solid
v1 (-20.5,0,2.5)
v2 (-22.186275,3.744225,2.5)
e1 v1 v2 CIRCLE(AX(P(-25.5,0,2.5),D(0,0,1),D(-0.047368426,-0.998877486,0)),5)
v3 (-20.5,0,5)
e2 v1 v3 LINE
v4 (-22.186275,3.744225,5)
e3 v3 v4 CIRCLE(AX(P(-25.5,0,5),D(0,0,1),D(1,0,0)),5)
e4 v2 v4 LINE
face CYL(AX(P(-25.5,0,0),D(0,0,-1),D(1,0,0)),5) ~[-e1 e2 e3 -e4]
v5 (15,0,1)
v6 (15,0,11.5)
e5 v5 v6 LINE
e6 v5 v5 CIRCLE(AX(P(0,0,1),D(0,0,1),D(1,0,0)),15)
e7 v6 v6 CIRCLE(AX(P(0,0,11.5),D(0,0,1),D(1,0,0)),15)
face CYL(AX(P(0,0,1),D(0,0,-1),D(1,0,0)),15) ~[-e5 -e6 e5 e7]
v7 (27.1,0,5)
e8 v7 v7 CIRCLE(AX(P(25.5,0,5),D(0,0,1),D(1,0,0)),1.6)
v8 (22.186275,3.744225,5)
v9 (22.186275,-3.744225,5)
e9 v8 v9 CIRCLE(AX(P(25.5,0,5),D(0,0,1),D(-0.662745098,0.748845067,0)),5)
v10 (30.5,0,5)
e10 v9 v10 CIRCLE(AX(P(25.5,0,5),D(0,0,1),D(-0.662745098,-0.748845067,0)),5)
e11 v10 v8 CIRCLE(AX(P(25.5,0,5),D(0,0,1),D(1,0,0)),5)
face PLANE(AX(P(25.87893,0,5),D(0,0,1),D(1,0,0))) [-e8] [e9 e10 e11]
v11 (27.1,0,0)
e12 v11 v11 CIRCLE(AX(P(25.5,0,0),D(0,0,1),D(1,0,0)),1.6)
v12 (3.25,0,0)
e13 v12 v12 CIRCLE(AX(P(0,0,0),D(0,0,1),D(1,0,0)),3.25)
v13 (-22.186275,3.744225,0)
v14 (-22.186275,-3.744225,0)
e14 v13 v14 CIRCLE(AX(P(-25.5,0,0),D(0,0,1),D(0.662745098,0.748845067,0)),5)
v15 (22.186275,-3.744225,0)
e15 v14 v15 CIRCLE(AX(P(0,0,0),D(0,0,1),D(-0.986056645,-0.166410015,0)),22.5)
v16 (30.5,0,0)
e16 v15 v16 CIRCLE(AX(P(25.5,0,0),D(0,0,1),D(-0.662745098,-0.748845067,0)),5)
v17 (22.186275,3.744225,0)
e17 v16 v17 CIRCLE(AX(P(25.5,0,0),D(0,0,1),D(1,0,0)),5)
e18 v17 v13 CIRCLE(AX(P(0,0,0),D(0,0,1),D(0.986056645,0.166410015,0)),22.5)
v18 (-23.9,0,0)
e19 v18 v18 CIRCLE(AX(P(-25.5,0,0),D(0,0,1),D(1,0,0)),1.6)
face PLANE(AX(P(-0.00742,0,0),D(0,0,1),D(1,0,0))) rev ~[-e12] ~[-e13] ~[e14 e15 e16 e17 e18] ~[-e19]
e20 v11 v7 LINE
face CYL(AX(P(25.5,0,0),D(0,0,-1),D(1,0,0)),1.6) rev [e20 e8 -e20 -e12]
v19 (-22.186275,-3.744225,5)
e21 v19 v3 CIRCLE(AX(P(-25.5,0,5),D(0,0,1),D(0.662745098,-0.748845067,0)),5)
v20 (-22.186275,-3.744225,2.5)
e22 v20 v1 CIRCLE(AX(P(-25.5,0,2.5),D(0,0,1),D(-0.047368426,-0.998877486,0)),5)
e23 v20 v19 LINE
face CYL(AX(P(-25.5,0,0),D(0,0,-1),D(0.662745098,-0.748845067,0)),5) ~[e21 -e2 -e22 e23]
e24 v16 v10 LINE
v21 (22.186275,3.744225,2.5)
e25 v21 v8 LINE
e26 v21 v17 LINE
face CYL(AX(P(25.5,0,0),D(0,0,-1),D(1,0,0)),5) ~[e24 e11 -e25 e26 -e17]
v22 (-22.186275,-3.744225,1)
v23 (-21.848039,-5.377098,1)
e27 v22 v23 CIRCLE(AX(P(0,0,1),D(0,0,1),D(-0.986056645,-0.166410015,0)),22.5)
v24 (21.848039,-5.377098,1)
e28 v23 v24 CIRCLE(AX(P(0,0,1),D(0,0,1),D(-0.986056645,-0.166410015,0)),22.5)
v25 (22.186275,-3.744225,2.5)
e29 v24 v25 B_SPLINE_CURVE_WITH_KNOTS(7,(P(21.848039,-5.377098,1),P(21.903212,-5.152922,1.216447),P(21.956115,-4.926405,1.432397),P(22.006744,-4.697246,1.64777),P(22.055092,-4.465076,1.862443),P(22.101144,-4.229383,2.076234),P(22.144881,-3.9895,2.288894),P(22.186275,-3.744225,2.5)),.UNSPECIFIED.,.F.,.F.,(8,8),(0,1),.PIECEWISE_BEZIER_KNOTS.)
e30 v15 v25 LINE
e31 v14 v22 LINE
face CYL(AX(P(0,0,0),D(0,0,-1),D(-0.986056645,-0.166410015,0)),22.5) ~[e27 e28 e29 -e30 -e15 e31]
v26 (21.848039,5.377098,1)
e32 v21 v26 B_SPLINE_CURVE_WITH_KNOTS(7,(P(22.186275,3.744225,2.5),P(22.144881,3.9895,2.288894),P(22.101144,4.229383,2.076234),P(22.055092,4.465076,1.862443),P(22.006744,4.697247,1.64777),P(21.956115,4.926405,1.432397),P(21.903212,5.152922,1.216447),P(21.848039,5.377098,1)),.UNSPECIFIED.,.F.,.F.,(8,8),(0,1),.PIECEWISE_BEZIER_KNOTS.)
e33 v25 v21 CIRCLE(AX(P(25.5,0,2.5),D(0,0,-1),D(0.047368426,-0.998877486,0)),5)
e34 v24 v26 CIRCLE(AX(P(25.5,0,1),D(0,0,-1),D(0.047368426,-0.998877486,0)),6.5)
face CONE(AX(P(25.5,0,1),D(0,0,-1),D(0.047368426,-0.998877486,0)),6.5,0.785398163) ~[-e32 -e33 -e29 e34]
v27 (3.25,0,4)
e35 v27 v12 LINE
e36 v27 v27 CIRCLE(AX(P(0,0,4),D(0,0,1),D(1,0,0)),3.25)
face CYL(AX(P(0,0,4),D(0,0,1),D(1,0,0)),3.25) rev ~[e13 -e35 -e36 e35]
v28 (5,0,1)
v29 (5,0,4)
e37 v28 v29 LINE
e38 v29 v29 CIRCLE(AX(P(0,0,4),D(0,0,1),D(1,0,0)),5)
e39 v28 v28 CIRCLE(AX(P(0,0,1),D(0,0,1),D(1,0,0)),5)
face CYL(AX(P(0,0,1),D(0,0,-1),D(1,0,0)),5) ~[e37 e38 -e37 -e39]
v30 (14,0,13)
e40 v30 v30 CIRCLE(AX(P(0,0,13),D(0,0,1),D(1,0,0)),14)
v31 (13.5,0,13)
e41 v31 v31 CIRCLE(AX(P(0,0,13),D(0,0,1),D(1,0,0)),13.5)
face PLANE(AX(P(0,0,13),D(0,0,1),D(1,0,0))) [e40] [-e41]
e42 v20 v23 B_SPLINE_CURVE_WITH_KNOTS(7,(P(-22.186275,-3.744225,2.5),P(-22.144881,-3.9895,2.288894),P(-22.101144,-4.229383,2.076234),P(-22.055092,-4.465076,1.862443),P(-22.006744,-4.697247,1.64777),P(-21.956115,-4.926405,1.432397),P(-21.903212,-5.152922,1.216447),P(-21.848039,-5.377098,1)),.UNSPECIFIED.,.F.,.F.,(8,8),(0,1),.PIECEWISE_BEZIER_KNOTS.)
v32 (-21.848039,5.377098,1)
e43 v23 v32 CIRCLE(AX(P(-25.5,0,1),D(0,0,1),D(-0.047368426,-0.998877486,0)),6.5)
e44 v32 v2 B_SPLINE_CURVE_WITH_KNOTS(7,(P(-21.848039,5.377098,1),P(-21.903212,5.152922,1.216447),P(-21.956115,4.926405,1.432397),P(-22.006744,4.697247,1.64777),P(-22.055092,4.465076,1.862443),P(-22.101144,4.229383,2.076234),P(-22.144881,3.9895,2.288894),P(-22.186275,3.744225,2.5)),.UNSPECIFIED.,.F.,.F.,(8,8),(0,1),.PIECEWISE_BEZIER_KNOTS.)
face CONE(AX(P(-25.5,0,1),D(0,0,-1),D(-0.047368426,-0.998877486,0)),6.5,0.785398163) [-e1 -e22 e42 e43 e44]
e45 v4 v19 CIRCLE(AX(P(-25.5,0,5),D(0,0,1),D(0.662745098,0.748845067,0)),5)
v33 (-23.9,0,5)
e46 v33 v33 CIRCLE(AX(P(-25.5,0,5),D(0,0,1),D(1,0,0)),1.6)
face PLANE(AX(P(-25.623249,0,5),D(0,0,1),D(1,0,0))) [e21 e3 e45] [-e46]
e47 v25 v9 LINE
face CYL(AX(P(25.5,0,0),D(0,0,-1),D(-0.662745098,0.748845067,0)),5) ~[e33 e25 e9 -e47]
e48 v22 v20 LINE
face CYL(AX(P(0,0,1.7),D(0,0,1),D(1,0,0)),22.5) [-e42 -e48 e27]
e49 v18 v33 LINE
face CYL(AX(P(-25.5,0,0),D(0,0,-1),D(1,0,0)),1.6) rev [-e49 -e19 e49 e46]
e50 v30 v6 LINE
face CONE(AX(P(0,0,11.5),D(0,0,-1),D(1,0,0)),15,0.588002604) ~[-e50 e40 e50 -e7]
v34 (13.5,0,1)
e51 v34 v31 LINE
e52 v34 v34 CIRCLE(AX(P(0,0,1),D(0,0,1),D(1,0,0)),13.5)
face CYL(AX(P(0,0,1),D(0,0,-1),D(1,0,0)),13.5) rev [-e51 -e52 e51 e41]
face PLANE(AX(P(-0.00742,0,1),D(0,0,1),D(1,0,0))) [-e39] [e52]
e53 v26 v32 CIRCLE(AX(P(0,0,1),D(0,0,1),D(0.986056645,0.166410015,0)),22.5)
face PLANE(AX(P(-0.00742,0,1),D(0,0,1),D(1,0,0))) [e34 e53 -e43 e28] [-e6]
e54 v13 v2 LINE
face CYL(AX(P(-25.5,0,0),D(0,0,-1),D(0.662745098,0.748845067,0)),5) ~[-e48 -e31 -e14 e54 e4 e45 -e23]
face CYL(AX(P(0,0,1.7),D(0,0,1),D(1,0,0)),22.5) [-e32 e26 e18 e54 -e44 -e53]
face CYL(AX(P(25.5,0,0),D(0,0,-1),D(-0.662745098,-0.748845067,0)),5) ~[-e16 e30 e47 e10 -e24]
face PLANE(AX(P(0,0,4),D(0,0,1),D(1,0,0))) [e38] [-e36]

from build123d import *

# Parameters (mm, degrees)
F0_R         = 1.6
F1_DEPTH     = 5
F2_DEPTH     = 1
F3_R         = 15
F3_R_2       = 13.5
F4_DEPTH     = 12
F5_SIZE2     = 1.5
F5_SIZE      = 1
F8_T4_ANGLE  = 185.4300536725
F8_S5_R      = 22.5
F8_T6_DEPTH  = 9
F8_T10_ANGLE = 185.4300536725
F8_S11_R     = 22.5
F8_T12_DEPTH = 9
F9_R         = 5
F10_DEPTH    = 3
F11_R        = 3.25
F12_DEPTH    = 5


# Not quite as in the source:
# - a fillet or chamfer that OpenCascade refuses, or shapes differently, is made with other operations: its cross-section is extruded or revolved along the edge and cut away or added
# - a feature of the source that left no trace in its solid (it failed there, or was rolled back) is left out


with BuildPart() as f1:
    # F0 (on Top) → F1 (new body)
    with BuildSketch(Plane.XY):
        with BuildLine():
            ThreePointArc((-22.1862745098, -3.7442253372), (-22.5, 0), (-22.1862745098, 3.7442253372))
            ThreePointArc((-22.1862745098, 3.7442253372), (-30.5, 0), (-22.1862745098, -3.7442253372))
        make_face()
        with Locations((-25.5, 0)):
            Circle(F0_R, mode=Mode.SUBTRACT)
        with BuildLine():
            ThreePointArc((-20.5, 0), (-20.9410183456, 2.0532136456), (-22.1862745098, 3.7442253372))
            ThreePointArc((-22.1862745098, 3.7442253372), (-22.5, 0), (-22.1862745098, -3.7442253372))
            ThreePointArc((-22.1862745098, -3.7442253372), (-20.9410183456, -2.0532136456), (-20.5, 0))
        make_face()
    extrude(amount=F1_DEPTH)



with BuildPart() as f1b:
    # F0 (on Top) → F1, piece 2 (new body)
    with BuildSketch(Plane.XY):
        with BuildLine():
            ThreePointArc((22.1862745098, 3.7442253372), (22.4214314493, 1.8786728733), (22.5, 0))
            ThreePointArc((22.5, 0), (22.4214314493, -1.8786728733), (22.1862745098, -3.7442253372))
            ThreePointArc((22.1862745098, -3.7442253372), (27.5532136456, -4.5589816544), (30.5, 0))
            ThreePointArc((30.5, 0), (27.5532136456, 4.5589816544), (22.1862745098, 3.7442253372))
        make_face()
        with Locations((25.5, 0)):
            Circle(F0_R, mode=Mode.SUBTRACT)
        with BuildLine():
            ThreePointArc((22.1862745098, -3.7442253372), (22.4214314493, -1.8786728733), (22.5, 0))
            ThreePointArc((22.5, 0), (22.4214314493, 1.8786728733), (22.1862745098, 3.7442253372))
            ThreePointArc((22.1862745098, 3.7442253372), (20.5, 0), (22.1862745098, -3.7442253372))
        make_face()
    extrude(amount=F1_DEPTH)


with BuildPart() as f1_1:
    add(f1.part)

    add(f1b.part)  # F2 merges F1b
    # F0 (on Top) → F2 (join)
    with BuildSketch(Plane.XY):
        with BuildLine():
            ThreePointArc((22.1862745098, -3.7442253372), (20.5, 0), (22.1862745098, 3.7442253372))
            ThreePointArc((22.1862745098, 3.7442253372), (0, 22.5), (-22.1862745098, 3.7442253372))
            ThreePointArc((-22.1862745098, 3.7442253372), (-20.9410183456, 2.0532136456), (-20.5, 0))
            ThreePointArc((-20.5, 0), (-20.9410183456, -2.0532136456), (-22.1862745098, -3.7442253372))
            ThreePointArc((-22.1862745098, -3.7442253372), (0, -22.5), (22.1862745098, -3.7442253372))
        make_face()
    extrude(amount=F2_DEPTH)

    # F3 (on face) → F4 (join)
    with BuildSketch(Plane.XY.offset(1)):
        Circle(F3_R)
        Circle(F3_R_2, mode=Mode.SUBTRACT)
    extrude(amount=F4_DEPTH)

    # F5
    f5_edges = [f1_1.edges().sort_by_distance(p)[0] for p in [
        (-15, 0, 13),
    ]]
    f5_side = f1_1.faces().sort_by_distance((-14.575736, 0, 13))[0]
    chamfer(f5_edges, length=F5_SIZE, length2=F5_SIZE2, reference=f5_side)

    # F8: chamfer of 1.5 on 2 edges, made by hand


with BuildPart() as f8_tool2:
    # F8_s3 → F8_t4 (revolve)
    with BuildSketch(Plane(origin=(25.4427839223, 1.2065389767, 0), x_dir=(0, 0, 1), z_dir=(0.9988774861, 0.0473684257, 0))):
        Polygon((1, 7.7078948555), (2.5, 6.2078948555), (1, 6.2078948555), align=None)
    revolve(axis=Axis((25.5, 0, 1), (0, 0, -1)), revolution_arc=F8_T4_ANGLE)

    # F8_s5 → F8_t6 (intersect, symmetric)
    with BuildSketch(Plane.XY.offset(1.8)):
        Circle(F8_S5_R)
    extrude(amount=F8_T6_DEPTH, both=True, mode=Mode.INTERSECT)


with BuildPart() as f1_2:
    add(f1_1.part)

    # F8_t1: union F8_tool2
    add(f8_tool2.part)


with BuildPart() as f8_tool8:
    # F8_s9 → F8_t10 (revolve)
    with BuildSketch(Plane(origin=(-25.4427839223, 1.2065389767, 0), x_dir=(0, 0, 1), z_dir=(-0.9988774861, 0.0473684257, 0))):
        Polygon((1, -7.7078948555), (2.5, -6.2078948555), (1, -6.2078948555), align=None)
    revolve(axis=Axis((-25.5, 0, 1), (0, 0, 1)), revolution_arc=F8_T10_ANGLE)

    # F8_s11 → F8_t12 (intersect, symmetric)
    with BuildSketch(Plane.XY.offset(1.7)):
        Circle(F8_S11_R)
    extrude(amount=F8_T12_DEPTH, both=True, mode=Mode.INTERSECT)


with BuildPart() as f1_3:
    add(f1_2.part)

    # F8_t7: union F8_tool8
    add(f8_tool8.part)

    # F9 (on face) → F10 (join)
    with BuildSketch(Plane.XY.offset(1)):
        Circle(F9_R)
    extrude(amount=F10_DEPTH)

    # F11 (on face) → F12 (cut)
    with BuildSketch(Plane.XY.offset(4)):
        Circle(F11_R)
    extrude(amount=-F12_DEPTH, mode=Mode.SUBTRACT)


solid = f1_3.part
